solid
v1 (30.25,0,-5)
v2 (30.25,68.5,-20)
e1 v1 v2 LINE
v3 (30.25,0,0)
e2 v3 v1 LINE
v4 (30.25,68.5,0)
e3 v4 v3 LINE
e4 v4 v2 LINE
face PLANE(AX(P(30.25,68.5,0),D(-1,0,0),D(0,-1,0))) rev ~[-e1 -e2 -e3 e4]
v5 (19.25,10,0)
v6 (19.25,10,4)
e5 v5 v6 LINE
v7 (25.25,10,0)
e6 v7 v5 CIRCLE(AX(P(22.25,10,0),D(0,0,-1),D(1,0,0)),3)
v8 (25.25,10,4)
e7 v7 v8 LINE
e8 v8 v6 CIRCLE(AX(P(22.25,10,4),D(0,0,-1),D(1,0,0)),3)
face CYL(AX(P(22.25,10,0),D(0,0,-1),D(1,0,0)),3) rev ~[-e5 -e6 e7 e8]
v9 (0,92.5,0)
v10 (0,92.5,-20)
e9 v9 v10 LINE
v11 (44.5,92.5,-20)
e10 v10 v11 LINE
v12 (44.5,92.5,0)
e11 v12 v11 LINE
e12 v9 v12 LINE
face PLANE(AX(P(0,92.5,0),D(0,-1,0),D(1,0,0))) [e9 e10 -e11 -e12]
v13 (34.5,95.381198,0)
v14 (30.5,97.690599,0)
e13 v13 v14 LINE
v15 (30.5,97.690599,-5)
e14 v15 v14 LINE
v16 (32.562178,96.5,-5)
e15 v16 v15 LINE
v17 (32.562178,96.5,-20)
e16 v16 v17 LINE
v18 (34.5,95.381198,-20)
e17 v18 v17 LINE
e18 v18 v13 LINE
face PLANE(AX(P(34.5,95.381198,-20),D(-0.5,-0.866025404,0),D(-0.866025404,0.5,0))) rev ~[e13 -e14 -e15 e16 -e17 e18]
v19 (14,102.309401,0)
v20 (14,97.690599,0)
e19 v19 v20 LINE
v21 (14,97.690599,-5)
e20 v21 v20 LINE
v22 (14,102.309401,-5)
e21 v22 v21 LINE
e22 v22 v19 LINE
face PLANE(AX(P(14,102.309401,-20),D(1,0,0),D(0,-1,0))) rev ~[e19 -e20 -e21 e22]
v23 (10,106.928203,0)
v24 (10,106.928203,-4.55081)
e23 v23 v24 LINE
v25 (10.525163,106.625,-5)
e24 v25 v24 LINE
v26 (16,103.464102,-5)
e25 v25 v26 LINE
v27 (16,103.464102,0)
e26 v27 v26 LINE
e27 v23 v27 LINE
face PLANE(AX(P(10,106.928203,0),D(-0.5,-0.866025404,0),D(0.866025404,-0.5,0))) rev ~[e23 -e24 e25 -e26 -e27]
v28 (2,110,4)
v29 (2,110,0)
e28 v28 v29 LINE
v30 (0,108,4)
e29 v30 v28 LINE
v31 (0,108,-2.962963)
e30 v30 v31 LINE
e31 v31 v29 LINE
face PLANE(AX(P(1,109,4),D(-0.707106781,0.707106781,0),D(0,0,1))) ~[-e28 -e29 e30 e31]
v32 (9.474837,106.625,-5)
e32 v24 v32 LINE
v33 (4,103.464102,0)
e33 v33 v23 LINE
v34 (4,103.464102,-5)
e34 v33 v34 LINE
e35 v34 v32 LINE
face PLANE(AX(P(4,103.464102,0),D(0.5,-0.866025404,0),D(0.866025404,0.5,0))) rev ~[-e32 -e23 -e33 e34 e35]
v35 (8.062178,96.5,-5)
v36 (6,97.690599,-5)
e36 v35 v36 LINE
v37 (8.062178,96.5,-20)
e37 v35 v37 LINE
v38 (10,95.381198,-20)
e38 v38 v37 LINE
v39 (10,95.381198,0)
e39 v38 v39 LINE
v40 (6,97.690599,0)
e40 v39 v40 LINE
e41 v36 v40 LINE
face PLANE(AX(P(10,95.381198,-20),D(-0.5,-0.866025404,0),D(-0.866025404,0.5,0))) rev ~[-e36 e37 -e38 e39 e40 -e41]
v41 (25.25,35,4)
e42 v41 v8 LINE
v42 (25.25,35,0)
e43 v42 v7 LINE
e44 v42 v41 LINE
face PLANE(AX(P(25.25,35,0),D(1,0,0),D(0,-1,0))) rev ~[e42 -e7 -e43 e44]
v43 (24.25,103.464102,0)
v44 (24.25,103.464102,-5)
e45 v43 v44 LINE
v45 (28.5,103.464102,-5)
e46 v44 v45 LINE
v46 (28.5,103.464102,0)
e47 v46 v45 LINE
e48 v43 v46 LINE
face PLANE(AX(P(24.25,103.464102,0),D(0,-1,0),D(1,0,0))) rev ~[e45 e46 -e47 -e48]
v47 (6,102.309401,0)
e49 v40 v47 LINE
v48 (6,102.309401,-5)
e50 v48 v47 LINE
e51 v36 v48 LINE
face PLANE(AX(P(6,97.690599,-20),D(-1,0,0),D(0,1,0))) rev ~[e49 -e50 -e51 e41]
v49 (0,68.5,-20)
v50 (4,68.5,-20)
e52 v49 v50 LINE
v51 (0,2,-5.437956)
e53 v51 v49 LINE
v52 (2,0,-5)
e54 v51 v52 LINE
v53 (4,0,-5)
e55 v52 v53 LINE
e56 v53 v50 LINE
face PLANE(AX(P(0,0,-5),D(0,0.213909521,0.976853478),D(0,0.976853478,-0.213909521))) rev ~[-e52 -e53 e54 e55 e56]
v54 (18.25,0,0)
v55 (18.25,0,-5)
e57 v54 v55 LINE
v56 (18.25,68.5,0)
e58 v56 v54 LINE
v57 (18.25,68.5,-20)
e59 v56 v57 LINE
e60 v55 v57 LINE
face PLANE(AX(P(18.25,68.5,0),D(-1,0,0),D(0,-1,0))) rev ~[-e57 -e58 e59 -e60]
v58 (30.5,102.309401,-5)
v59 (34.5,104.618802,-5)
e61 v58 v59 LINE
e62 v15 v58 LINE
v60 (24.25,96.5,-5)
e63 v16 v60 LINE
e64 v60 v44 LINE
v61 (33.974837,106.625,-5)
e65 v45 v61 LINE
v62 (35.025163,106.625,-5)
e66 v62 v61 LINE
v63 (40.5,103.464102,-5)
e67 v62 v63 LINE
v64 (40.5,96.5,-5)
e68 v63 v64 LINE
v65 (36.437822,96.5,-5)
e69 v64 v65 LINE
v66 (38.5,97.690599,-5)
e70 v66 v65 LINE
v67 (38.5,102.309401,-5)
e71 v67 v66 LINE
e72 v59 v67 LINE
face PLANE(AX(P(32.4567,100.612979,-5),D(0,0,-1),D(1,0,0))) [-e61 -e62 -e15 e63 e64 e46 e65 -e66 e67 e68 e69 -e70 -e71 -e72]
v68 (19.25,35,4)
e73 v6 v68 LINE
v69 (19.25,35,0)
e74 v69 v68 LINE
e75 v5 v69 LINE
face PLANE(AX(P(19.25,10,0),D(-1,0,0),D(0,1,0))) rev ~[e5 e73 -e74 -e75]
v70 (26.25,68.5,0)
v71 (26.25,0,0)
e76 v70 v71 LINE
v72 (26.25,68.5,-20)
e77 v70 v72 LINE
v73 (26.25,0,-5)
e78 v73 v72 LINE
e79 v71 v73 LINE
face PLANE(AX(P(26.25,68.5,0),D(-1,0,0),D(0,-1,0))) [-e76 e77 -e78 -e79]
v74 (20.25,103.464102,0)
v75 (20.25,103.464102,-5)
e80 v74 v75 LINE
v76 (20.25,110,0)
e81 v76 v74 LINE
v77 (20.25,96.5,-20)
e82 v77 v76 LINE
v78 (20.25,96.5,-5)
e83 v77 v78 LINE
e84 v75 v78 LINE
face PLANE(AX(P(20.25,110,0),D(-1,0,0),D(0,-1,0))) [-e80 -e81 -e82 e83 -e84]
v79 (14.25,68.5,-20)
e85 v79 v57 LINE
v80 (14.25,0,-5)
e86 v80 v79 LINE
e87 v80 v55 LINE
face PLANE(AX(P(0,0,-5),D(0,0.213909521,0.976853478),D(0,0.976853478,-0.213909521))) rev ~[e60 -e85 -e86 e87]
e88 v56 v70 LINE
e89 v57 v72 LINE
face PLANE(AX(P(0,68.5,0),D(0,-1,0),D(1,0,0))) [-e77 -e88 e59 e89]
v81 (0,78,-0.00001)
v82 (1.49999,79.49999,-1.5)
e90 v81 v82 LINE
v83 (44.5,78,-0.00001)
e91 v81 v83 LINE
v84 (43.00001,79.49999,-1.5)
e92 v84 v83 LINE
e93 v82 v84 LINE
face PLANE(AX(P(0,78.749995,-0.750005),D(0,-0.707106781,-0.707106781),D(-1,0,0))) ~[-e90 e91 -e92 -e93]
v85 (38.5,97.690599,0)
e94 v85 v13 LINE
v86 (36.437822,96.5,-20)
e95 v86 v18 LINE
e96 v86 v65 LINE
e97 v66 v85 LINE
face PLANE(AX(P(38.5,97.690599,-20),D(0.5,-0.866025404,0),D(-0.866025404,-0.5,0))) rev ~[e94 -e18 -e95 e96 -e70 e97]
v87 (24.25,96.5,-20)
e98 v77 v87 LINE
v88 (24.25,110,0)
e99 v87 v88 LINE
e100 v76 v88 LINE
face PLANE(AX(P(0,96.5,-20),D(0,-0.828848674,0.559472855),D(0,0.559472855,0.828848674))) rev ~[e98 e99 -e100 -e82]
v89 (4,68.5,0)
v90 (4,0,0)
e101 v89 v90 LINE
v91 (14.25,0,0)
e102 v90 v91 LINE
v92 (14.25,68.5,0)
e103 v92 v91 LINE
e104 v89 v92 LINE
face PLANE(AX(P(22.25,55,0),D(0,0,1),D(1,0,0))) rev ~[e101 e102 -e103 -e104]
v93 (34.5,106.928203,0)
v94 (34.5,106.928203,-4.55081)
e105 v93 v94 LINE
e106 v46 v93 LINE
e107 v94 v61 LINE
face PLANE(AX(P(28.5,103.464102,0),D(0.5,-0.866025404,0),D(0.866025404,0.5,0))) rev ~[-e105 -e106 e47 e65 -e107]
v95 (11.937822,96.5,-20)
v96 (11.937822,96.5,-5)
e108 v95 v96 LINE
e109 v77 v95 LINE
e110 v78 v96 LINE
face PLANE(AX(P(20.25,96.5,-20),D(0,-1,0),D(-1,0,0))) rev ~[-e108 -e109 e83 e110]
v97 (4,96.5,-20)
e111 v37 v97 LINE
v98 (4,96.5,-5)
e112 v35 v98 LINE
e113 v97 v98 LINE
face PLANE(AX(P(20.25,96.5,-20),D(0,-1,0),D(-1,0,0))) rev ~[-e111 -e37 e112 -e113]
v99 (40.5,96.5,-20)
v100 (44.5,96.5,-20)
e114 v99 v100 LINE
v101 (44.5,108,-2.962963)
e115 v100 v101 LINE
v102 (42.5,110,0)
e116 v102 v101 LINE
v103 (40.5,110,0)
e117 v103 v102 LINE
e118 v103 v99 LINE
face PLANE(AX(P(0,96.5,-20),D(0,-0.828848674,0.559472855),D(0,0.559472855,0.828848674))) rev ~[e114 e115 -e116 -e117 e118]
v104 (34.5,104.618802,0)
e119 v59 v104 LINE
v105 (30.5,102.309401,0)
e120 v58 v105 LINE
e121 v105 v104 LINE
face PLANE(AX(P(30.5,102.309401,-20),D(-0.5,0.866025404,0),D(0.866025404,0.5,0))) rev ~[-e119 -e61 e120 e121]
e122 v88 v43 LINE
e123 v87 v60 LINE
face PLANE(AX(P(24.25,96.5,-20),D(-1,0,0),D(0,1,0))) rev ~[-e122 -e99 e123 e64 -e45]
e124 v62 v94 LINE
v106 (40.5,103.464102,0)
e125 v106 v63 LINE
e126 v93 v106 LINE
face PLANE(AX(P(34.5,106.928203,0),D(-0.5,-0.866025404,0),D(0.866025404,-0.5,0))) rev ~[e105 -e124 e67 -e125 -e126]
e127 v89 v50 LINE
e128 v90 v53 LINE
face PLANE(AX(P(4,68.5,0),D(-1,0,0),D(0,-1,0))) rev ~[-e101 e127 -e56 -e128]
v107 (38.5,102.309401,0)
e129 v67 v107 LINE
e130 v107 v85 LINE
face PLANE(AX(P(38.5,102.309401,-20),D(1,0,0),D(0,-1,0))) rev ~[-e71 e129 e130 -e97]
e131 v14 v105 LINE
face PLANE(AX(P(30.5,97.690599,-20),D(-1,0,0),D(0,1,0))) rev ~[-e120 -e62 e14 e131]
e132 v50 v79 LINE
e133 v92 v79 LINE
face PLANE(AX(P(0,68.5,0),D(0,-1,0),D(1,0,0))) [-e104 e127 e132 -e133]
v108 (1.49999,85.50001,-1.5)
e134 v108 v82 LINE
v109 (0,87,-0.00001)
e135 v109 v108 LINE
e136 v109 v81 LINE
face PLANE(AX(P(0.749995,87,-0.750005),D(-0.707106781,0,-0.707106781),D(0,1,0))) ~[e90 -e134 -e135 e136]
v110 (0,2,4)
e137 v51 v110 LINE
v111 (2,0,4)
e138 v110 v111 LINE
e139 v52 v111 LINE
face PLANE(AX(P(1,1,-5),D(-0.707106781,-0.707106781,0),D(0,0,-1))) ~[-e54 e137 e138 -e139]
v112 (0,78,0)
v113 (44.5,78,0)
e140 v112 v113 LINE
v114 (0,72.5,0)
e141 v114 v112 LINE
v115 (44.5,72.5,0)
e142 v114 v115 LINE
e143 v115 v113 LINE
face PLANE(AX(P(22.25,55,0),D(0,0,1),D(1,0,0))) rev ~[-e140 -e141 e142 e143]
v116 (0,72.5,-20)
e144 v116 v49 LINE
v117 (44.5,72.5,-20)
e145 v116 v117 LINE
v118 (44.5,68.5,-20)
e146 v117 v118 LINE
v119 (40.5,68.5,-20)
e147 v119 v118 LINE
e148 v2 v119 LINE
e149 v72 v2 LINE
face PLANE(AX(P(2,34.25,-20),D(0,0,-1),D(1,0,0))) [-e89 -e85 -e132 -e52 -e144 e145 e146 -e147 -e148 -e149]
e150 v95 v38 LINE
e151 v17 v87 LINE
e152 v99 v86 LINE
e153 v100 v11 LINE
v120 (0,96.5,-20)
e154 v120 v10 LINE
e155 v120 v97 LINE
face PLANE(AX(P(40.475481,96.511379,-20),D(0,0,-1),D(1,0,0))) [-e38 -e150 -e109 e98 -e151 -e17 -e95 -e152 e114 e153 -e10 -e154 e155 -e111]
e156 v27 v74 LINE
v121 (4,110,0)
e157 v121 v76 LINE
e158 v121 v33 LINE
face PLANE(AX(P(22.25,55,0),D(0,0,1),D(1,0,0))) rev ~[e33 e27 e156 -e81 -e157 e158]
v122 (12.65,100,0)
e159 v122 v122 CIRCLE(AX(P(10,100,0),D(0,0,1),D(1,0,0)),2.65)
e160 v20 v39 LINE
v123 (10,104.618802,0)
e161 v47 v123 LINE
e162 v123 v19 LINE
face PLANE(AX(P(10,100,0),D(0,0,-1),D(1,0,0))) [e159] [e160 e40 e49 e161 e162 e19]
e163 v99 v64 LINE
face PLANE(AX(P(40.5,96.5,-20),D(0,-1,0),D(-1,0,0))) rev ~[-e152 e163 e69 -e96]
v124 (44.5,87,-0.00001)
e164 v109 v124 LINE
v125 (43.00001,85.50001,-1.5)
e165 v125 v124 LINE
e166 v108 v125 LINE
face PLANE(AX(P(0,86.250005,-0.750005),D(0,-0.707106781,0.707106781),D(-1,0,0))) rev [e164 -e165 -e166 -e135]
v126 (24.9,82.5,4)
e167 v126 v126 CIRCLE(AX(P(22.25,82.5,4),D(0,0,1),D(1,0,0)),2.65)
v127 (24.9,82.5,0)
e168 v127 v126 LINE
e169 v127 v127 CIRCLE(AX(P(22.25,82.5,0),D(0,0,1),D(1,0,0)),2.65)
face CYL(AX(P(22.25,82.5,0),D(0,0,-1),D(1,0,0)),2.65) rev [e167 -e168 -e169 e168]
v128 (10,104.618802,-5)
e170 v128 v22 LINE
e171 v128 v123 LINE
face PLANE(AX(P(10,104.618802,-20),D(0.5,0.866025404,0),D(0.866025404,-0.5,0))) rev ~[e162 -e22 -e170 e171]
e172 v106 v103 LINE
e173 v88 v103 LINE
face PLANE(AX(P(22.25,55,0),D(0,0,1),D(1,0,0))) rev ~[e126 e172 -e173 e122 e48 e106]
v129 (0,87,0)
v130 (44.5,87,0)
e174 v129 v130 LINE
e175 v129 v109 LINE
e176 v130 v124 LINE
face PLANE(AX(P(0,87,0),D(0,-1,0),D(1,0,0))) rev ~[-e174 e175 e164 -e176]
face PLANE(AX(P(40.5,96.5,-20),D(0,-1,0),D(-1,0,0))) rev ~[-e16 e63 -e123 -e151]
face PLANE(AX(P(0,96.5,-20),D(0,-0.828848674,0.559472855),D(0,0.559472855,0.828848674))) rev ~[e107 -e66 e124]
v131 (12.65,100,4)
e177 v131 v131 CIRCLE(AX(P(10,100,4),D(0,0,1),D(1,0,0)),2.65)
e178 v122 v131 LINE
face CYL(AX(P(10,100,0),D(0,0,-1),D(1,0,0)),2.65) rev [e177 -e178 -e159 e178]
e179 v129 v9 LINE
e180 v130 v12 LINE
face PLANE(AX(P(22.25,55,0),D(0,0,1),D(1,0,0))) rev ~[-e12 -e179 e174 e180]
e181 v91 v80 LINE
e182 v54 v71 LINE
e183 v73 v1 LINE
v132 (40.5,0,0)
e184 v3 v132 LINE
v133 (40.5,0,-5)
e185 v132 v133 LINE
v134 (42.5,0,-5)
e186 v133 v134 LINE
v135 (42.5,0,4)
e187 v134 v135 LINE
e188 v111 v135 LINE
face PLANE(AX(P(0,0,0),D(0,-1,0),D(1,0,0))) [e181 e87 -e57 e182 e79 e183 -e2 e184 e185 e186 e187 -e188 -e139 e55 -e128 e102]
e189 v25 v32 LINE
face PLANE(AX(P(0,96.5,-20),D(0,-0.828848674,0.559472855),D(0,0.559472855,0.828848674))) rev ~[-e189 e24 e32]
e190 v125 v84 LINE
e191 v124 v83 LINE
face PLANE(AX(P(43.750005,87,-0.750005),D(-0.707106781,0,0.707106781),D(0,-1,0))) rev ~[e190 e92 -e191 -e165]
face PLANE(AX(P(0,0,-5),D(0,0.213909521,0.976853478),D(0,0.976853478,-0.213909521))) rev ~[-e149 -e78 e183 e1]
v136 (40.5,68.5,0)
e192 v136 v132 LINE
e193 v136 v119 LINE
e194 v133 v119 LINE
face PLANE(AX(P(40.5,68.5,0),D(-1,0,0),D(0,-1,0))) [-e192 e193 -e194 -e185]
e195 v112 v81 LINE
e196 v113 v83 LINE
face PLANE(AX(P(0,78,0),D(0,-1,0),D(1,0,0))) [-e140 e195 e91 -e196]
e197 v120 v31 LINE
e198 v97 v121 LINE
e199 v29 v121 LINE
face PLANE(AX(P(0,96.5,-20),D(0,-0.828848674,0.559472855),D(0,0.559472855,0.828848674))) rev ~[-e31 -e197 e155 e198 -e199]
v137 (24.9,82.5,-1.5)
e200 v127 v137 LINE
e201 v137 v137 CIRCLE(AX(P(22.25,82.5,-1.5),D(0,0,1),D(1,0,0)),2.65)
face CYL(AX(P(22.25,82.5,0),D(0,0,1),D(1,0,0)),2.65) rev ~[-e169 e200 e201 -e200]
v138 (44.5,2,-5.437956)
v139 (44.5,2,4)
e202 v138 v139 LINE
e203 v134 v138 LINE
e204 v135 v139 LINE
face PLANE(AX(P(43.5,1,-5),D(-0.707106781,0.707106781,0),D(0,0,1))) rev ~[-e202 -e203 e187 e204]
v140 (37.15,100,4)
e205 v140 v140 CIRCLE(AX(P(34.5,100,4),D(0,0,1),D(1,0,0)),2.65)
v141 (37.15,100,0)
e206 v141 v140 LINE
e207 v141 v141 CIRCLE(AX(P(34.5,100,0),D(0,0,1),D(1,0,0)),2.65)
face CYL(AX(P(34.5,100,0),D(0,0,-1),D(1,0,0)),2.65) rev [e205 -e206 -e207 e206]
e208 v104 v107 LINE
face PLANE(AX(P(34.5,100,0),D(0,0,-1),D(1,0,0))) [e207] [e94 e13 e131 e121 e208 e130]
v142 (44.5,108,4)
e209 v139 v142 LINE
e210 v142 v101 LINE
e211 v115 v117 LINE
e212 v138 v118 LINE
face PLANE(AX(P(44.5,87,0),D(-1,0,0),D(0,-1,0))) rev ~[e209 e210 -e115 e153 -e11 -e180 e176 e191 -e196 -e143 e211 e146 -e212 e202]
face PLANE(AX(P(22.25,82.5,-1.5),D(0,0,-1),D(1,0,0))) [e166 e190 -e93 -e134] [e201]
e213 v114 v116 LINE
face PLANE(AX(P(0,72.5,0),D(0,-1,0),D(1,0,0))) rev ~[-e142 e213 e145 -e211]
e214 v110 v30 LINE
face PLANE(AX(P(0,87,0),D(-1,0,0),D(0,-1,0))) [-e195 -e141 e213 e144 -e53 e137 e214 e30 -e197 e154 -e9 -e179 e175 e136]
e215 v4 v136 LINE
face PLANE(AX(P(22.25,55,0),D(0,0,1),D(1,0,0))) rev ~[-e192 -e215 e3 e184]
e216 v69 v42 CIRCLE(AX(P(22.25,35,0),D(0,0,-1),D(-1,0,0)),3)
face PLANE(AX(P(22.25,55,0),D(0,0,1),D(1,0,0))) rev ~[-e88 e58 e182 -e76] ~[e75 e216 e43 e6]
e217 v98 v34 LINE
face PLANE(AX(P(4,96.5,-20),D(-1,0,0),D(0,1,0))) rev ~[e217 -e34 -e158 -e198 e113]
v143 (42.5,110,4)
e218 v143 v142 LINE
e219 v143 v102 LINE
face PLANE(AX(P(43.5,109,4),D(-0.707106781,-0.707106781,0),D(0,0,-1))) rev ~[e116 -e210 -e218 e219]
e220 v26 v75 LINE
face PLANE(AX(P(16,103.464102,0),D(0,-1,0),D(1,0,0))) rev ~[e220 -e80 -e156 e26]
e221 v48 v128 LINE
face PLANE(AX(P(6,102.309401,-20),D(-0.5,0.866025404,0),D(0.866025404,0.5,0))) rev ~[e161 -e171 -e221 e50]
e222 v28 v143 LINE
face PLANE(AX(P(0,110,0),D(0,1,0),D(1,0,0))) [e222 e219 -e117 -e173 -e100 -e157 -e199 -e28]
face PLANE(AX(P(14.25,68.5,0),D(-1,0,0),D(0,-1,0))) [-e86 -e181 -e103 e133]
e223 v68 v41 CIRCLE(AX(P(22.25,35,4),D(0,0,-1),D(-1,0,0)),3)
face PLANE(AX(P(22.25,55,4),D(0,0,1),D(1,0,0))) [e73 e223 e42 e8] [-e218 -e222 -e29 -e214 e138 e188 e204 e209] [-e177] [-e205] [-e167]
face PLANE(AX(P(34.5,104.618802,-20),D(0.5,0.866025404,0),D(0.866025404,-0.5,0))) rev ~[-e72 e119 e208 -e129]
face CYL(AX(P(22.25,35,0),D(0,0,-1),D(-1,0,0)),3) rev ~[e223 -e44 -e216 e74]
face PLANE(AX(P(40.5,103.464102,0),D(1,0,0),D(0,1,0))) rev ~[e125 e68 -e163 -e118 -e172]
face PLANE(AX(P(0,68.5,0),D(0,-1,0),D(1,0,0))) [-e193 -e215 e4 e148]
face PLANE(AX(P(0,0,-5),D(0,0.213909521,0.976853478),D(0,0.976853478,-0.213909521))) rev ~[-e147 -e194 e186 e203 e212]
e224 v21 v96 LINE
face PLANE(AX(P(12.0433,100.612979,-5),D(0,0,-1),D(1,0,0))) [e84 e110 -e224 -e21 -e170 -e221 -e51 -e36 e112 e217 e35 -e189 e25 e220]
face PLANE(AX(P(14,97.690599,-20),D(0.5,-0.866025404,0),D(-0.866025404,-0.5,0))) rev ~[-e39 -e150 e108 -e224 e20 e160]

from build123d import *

# Parameters (mm, degrees)
F0_W      = 44.5
F0_H      = 110
F0_R      = 2.65
F1_DEPTH  = 4
F2_W      = 44.5
F2_H      = 4
F3_DEPTH  = 20
F4_W      = 4
F4_H      = 68.5
F4_H_2    = 13.5
F5_DEPTH  = 20
F7_DEPTH  = 20
F9_DEPTH  = 15
F11_DEPTH = 44.501
F12_DEPTH = 20.001
F14_DEPTH = 20
F15_W     = 44.5
F15_H     = 9
F16_DEPTH = 1.5
F17_SIZE  = 1.49999
F18_DEPTH = 20.001
F19_SIZE  = 2


# Not quite as in the source:
# - a fillet or chamfer is up to 0.001 mm smaller than in the source, because OpenCascade refuses the exact size


with BuildPart() as f1:
    # F0 (on Top) → F1 (new body)
    with BuildSketch(Plane.XY):
        with Locations((22.25, 55)):
            Rectangle(F0_W, F0_H)
        with BuildLine():
            Line((25.25, 35), (25.25, 10))
            ThreePointArc((25.25, 10), (22.25, 7), (19.25, 10))
            Line((19.25, 10), (19.25, 35))
            ThreePointArc((19.25, 35), (22.25, 38), (25.25, 35))
        make_face(mode=Mode.SUBTRACT)
        with Locations((10, 100)):
            Circle(F0_R, mode=Mode.SUBTRACT)
        with Locations((22.25, 82.5)):
            Circle(F0_R, mode=Mode.SUBTRACT)
        with Locations((34.5, 100)):
            Circle(F0_R, mode=Mode.SUBTRACT)
    extrude(amount=F1_DEPTH)

    # F2 (on face) → F3 (join)
    with BuildSketch(Plane(origin=(0, 0, 0), x_dir=(1, 0, 0), z_dir=(0, 0, -1))):
        with Locations((22.25, -94.5)):
            Rectangle(F2_W, F2_H)
        with Locations((22.25, -70.5)):
            Rectangle(F2_W, F2_H)
    extrude(amount=F3_DEPTH)

    # F4 (on face) → F5 (join)
    with BuildSketch(Plane(origin=(0, 0, 0), x_dir=(1, 0, 0), z_dir=(0, 0, -1))):
        with Locations((2, -34.25)):
            Rectangle(F4_W, F4_H)
        with Locations((42.5, -34.25)):
            Rectangle(F4_W, F4_H)
        Polygon((0, -96.5), (0, -110), (4, -110), (4, -103.4641016151), (4, -96.5358983849), (4, -96.5), align=None)
        Polygon((4, -96.5358983849), (4, -103.4641016151), (10, -106.9282032303), (16, -103.4641016151), (16, -96.5358983849), (15.9378221735, -96.5), (11.9378221735, -96.5), (14, -97.6905989232), (14, -102.3094010768), (10, -104.6188021535), (6, -102.3094010768), (6, -97.6905989232), (8.0621778265, -96.5), (4.0621778265, -96.5), align=None)
        Polygon((11.9378221735, -96.5), (8.0621778265, -96.5), (6, -97.6905989232), (6, -102.3094010768), (10, -104.6188021535), (14, -102.3094010768), (14, -97.6905989232), align=None)
        Polygon((40.5, -110), (44.5, -110), (44.5, -96.5), (40.5, -96.5), (40.5, -96.5358983849), (40.5, -103.4641016151), align=None)
        Polygon((34.5, -106.9282032303), (40.5, -103.4641016151), (40.5, -96.5358983849), (40.4378221735, -96.5), (36.4378221735, -96.5), (38.5, -97.6905989232), (38.5, -102.3094010768), (34.5, -104.6188021535), (30.5, -102.3094010768), (30.5, -97.6905989232), (32.5621778265, -96.5), (28.5621778265, -96.5), (28.5, -96.5358983849), (28.5, -103.4641016151), align=None)
        Polygon((38.5, -97.6905989232), (36.4378221735, -96.5), (32.5621778265, -96.5), (30.5, -97.6905989232), (30.5, -102.3094010768), (34.5, -104.6188021535), (38.5, -102.3094010768), align=None)
        Polygon((32.5621778265, -96.5), (36.4378221735, -96.5), (34.5, -95.3811978465), align=None)
        with Locations((16.25, -34.25)):
            Rectangle(F4_W, F4_H)
        with Locations((28.25, -34.25)):
            Rectangle(F4_W, F4_H)
        with Locations((22.25, -103.25)):
            Rectangle(F4_W, F4_H_2)
    extrude(amount=F5_DEPTH)

    # F6 (on face) → F7 (join)
    with BuildSketch(Plane(origin=(0, 0, 0), x_dir=(1, 0, 0), z_dir=(0, 0, -1))):
        Polygon((40.5, -96.5), (40.4378221735, -96.5), (40.5, -96.5358983849), align=None)
        Polygon((4.0621778265, -96.5), (4, -96.5), (4, -96.5358983849), align=None)
        Polygon((16, -96.5358983849), (16, -103.4641016151), (20.25, -103.4641016151), (20.25, -96.5), (15.9378221735, -96.5), align=None)
        Polygon((28.5621778265, -96.5), (24.25, -96.5), (24.25, -103.4641016151), (28.5, -103.4641016151), (28.5, -96.5358983849), align=None)
    extrude(amount=F7_DEPTH)

    # F8 (on face) → F9 (cut)
    with BuildSketch(Plane(origin=(0, 0, -20), x_dir=(1, 0, 0), z_dir=(0, 0, -1))):
        Polygon((4, -103.4641016151), (10, -106.9282032303), (16, -103.4641016151), (20.25, -103.4641016151), (20.25, -96.5), (4, -96.5), align=None)
        Polygon((24.25, -103.4641016151), (28.5, -103.4641016151), (34.5, -106.9282032303), (40.5, -103.4641016151), (40.5, -96.5), (24.25, -96.5), align=None)
    extrude(amount=-F9_DEPTH, mode=Mode.SUBTRACT)

    # F10 (on face) → F11 (cut, through all)
    with BuildSketch(Plane(origin=(0, 0, 0), x_dir=(0, -1, 0), z_dir=(-1, 0, 0))):
        Polygon((-96.5, -20), (-110, 0), (-110, -20), align=None)
        Polygon((0, -5), (-68.5, -20), (0, -20), align=None)
    extrude(amount=-F11_DEPTH, mode=Mode.SUBTRACT)

    # F12 (cut, through all): faces of the model
    f12_faces = [f1.faces().sort_by_distance(p)[0] for p in [
        (34.5, 100, 0),
        (10, 100, 0),
    ]]
    extrude(f12_faces, amount=-F12_DEPTH, mode=Mode.SUBTRACT)

    # F13 (on face) → F14 (cut, through all)
    with BuildSketch(Plane(origin=(0, 0, -20), x_dir=(1, 0, 0), z_dir=(0, 0, -1))):
        Polygon((14, -102.3094010768), (14, -97.6905989232), (10, -95.3811978465), (6, -97.6905989232), (6, -102.3094010768), (10, -104.6188021535), align=None)
        Polygon((38.5, -102.3094010768), (38.5, -97.6905989232), (34.5, -95.3811978465), (30.5, -97.6905989232), (30.5, -102.3094010768), (34.5, -104.6188021535), align=None)
    extrude(amount=-F14_DEPTH, mode=Mode.SUBTRACT)

    # F15 (on face) → F16 (join)
    with BuildSketch(Plane(origin=(0, 0, 0), x_dir=(1, 0, 0), z_dir=(0, 0, -1))):
        with Locations((22.25, -82.5)):
            Rectangle(F15_W, F15_H)
    extrude(amount=F16_DEPTH)

    # F17 (size 1.5 in the source; OpenCascade refuses exactly that, so slightly less here)
    f17_edges = [f1.edges().sort_by_distance(p)[0] for p in [
        (44.5, 82.5, -1.5),
        (22.25, 78, -1.5),
        (0, 82.5, -1.5),
        (22.25, 87, -1.5),
    ]]
    chamfer(f17_edges, length=F17_SIZE)

    # F18 (cut, through all): a face of the model
    f18_faces = [f1.faces().sort_by_distance(p)[0] for p in [
        (22.25, 82.5, 0),
    ]]
    extrude(f18_faces, amount=-F18_DEPTH, mode=Mode.SUBTRACT)

    # F19
    f19_edges = [f1.edges().sort_by_distance(p)[0] for p in [
        (44.5, 110, 2),
        (0, 110, 2),
        (0, 0, -0.5),
        (44.5, 0, -0.5),
    ]]
    chamfer(f19_edges, length=F19_SIZE)


solid = f1.part
